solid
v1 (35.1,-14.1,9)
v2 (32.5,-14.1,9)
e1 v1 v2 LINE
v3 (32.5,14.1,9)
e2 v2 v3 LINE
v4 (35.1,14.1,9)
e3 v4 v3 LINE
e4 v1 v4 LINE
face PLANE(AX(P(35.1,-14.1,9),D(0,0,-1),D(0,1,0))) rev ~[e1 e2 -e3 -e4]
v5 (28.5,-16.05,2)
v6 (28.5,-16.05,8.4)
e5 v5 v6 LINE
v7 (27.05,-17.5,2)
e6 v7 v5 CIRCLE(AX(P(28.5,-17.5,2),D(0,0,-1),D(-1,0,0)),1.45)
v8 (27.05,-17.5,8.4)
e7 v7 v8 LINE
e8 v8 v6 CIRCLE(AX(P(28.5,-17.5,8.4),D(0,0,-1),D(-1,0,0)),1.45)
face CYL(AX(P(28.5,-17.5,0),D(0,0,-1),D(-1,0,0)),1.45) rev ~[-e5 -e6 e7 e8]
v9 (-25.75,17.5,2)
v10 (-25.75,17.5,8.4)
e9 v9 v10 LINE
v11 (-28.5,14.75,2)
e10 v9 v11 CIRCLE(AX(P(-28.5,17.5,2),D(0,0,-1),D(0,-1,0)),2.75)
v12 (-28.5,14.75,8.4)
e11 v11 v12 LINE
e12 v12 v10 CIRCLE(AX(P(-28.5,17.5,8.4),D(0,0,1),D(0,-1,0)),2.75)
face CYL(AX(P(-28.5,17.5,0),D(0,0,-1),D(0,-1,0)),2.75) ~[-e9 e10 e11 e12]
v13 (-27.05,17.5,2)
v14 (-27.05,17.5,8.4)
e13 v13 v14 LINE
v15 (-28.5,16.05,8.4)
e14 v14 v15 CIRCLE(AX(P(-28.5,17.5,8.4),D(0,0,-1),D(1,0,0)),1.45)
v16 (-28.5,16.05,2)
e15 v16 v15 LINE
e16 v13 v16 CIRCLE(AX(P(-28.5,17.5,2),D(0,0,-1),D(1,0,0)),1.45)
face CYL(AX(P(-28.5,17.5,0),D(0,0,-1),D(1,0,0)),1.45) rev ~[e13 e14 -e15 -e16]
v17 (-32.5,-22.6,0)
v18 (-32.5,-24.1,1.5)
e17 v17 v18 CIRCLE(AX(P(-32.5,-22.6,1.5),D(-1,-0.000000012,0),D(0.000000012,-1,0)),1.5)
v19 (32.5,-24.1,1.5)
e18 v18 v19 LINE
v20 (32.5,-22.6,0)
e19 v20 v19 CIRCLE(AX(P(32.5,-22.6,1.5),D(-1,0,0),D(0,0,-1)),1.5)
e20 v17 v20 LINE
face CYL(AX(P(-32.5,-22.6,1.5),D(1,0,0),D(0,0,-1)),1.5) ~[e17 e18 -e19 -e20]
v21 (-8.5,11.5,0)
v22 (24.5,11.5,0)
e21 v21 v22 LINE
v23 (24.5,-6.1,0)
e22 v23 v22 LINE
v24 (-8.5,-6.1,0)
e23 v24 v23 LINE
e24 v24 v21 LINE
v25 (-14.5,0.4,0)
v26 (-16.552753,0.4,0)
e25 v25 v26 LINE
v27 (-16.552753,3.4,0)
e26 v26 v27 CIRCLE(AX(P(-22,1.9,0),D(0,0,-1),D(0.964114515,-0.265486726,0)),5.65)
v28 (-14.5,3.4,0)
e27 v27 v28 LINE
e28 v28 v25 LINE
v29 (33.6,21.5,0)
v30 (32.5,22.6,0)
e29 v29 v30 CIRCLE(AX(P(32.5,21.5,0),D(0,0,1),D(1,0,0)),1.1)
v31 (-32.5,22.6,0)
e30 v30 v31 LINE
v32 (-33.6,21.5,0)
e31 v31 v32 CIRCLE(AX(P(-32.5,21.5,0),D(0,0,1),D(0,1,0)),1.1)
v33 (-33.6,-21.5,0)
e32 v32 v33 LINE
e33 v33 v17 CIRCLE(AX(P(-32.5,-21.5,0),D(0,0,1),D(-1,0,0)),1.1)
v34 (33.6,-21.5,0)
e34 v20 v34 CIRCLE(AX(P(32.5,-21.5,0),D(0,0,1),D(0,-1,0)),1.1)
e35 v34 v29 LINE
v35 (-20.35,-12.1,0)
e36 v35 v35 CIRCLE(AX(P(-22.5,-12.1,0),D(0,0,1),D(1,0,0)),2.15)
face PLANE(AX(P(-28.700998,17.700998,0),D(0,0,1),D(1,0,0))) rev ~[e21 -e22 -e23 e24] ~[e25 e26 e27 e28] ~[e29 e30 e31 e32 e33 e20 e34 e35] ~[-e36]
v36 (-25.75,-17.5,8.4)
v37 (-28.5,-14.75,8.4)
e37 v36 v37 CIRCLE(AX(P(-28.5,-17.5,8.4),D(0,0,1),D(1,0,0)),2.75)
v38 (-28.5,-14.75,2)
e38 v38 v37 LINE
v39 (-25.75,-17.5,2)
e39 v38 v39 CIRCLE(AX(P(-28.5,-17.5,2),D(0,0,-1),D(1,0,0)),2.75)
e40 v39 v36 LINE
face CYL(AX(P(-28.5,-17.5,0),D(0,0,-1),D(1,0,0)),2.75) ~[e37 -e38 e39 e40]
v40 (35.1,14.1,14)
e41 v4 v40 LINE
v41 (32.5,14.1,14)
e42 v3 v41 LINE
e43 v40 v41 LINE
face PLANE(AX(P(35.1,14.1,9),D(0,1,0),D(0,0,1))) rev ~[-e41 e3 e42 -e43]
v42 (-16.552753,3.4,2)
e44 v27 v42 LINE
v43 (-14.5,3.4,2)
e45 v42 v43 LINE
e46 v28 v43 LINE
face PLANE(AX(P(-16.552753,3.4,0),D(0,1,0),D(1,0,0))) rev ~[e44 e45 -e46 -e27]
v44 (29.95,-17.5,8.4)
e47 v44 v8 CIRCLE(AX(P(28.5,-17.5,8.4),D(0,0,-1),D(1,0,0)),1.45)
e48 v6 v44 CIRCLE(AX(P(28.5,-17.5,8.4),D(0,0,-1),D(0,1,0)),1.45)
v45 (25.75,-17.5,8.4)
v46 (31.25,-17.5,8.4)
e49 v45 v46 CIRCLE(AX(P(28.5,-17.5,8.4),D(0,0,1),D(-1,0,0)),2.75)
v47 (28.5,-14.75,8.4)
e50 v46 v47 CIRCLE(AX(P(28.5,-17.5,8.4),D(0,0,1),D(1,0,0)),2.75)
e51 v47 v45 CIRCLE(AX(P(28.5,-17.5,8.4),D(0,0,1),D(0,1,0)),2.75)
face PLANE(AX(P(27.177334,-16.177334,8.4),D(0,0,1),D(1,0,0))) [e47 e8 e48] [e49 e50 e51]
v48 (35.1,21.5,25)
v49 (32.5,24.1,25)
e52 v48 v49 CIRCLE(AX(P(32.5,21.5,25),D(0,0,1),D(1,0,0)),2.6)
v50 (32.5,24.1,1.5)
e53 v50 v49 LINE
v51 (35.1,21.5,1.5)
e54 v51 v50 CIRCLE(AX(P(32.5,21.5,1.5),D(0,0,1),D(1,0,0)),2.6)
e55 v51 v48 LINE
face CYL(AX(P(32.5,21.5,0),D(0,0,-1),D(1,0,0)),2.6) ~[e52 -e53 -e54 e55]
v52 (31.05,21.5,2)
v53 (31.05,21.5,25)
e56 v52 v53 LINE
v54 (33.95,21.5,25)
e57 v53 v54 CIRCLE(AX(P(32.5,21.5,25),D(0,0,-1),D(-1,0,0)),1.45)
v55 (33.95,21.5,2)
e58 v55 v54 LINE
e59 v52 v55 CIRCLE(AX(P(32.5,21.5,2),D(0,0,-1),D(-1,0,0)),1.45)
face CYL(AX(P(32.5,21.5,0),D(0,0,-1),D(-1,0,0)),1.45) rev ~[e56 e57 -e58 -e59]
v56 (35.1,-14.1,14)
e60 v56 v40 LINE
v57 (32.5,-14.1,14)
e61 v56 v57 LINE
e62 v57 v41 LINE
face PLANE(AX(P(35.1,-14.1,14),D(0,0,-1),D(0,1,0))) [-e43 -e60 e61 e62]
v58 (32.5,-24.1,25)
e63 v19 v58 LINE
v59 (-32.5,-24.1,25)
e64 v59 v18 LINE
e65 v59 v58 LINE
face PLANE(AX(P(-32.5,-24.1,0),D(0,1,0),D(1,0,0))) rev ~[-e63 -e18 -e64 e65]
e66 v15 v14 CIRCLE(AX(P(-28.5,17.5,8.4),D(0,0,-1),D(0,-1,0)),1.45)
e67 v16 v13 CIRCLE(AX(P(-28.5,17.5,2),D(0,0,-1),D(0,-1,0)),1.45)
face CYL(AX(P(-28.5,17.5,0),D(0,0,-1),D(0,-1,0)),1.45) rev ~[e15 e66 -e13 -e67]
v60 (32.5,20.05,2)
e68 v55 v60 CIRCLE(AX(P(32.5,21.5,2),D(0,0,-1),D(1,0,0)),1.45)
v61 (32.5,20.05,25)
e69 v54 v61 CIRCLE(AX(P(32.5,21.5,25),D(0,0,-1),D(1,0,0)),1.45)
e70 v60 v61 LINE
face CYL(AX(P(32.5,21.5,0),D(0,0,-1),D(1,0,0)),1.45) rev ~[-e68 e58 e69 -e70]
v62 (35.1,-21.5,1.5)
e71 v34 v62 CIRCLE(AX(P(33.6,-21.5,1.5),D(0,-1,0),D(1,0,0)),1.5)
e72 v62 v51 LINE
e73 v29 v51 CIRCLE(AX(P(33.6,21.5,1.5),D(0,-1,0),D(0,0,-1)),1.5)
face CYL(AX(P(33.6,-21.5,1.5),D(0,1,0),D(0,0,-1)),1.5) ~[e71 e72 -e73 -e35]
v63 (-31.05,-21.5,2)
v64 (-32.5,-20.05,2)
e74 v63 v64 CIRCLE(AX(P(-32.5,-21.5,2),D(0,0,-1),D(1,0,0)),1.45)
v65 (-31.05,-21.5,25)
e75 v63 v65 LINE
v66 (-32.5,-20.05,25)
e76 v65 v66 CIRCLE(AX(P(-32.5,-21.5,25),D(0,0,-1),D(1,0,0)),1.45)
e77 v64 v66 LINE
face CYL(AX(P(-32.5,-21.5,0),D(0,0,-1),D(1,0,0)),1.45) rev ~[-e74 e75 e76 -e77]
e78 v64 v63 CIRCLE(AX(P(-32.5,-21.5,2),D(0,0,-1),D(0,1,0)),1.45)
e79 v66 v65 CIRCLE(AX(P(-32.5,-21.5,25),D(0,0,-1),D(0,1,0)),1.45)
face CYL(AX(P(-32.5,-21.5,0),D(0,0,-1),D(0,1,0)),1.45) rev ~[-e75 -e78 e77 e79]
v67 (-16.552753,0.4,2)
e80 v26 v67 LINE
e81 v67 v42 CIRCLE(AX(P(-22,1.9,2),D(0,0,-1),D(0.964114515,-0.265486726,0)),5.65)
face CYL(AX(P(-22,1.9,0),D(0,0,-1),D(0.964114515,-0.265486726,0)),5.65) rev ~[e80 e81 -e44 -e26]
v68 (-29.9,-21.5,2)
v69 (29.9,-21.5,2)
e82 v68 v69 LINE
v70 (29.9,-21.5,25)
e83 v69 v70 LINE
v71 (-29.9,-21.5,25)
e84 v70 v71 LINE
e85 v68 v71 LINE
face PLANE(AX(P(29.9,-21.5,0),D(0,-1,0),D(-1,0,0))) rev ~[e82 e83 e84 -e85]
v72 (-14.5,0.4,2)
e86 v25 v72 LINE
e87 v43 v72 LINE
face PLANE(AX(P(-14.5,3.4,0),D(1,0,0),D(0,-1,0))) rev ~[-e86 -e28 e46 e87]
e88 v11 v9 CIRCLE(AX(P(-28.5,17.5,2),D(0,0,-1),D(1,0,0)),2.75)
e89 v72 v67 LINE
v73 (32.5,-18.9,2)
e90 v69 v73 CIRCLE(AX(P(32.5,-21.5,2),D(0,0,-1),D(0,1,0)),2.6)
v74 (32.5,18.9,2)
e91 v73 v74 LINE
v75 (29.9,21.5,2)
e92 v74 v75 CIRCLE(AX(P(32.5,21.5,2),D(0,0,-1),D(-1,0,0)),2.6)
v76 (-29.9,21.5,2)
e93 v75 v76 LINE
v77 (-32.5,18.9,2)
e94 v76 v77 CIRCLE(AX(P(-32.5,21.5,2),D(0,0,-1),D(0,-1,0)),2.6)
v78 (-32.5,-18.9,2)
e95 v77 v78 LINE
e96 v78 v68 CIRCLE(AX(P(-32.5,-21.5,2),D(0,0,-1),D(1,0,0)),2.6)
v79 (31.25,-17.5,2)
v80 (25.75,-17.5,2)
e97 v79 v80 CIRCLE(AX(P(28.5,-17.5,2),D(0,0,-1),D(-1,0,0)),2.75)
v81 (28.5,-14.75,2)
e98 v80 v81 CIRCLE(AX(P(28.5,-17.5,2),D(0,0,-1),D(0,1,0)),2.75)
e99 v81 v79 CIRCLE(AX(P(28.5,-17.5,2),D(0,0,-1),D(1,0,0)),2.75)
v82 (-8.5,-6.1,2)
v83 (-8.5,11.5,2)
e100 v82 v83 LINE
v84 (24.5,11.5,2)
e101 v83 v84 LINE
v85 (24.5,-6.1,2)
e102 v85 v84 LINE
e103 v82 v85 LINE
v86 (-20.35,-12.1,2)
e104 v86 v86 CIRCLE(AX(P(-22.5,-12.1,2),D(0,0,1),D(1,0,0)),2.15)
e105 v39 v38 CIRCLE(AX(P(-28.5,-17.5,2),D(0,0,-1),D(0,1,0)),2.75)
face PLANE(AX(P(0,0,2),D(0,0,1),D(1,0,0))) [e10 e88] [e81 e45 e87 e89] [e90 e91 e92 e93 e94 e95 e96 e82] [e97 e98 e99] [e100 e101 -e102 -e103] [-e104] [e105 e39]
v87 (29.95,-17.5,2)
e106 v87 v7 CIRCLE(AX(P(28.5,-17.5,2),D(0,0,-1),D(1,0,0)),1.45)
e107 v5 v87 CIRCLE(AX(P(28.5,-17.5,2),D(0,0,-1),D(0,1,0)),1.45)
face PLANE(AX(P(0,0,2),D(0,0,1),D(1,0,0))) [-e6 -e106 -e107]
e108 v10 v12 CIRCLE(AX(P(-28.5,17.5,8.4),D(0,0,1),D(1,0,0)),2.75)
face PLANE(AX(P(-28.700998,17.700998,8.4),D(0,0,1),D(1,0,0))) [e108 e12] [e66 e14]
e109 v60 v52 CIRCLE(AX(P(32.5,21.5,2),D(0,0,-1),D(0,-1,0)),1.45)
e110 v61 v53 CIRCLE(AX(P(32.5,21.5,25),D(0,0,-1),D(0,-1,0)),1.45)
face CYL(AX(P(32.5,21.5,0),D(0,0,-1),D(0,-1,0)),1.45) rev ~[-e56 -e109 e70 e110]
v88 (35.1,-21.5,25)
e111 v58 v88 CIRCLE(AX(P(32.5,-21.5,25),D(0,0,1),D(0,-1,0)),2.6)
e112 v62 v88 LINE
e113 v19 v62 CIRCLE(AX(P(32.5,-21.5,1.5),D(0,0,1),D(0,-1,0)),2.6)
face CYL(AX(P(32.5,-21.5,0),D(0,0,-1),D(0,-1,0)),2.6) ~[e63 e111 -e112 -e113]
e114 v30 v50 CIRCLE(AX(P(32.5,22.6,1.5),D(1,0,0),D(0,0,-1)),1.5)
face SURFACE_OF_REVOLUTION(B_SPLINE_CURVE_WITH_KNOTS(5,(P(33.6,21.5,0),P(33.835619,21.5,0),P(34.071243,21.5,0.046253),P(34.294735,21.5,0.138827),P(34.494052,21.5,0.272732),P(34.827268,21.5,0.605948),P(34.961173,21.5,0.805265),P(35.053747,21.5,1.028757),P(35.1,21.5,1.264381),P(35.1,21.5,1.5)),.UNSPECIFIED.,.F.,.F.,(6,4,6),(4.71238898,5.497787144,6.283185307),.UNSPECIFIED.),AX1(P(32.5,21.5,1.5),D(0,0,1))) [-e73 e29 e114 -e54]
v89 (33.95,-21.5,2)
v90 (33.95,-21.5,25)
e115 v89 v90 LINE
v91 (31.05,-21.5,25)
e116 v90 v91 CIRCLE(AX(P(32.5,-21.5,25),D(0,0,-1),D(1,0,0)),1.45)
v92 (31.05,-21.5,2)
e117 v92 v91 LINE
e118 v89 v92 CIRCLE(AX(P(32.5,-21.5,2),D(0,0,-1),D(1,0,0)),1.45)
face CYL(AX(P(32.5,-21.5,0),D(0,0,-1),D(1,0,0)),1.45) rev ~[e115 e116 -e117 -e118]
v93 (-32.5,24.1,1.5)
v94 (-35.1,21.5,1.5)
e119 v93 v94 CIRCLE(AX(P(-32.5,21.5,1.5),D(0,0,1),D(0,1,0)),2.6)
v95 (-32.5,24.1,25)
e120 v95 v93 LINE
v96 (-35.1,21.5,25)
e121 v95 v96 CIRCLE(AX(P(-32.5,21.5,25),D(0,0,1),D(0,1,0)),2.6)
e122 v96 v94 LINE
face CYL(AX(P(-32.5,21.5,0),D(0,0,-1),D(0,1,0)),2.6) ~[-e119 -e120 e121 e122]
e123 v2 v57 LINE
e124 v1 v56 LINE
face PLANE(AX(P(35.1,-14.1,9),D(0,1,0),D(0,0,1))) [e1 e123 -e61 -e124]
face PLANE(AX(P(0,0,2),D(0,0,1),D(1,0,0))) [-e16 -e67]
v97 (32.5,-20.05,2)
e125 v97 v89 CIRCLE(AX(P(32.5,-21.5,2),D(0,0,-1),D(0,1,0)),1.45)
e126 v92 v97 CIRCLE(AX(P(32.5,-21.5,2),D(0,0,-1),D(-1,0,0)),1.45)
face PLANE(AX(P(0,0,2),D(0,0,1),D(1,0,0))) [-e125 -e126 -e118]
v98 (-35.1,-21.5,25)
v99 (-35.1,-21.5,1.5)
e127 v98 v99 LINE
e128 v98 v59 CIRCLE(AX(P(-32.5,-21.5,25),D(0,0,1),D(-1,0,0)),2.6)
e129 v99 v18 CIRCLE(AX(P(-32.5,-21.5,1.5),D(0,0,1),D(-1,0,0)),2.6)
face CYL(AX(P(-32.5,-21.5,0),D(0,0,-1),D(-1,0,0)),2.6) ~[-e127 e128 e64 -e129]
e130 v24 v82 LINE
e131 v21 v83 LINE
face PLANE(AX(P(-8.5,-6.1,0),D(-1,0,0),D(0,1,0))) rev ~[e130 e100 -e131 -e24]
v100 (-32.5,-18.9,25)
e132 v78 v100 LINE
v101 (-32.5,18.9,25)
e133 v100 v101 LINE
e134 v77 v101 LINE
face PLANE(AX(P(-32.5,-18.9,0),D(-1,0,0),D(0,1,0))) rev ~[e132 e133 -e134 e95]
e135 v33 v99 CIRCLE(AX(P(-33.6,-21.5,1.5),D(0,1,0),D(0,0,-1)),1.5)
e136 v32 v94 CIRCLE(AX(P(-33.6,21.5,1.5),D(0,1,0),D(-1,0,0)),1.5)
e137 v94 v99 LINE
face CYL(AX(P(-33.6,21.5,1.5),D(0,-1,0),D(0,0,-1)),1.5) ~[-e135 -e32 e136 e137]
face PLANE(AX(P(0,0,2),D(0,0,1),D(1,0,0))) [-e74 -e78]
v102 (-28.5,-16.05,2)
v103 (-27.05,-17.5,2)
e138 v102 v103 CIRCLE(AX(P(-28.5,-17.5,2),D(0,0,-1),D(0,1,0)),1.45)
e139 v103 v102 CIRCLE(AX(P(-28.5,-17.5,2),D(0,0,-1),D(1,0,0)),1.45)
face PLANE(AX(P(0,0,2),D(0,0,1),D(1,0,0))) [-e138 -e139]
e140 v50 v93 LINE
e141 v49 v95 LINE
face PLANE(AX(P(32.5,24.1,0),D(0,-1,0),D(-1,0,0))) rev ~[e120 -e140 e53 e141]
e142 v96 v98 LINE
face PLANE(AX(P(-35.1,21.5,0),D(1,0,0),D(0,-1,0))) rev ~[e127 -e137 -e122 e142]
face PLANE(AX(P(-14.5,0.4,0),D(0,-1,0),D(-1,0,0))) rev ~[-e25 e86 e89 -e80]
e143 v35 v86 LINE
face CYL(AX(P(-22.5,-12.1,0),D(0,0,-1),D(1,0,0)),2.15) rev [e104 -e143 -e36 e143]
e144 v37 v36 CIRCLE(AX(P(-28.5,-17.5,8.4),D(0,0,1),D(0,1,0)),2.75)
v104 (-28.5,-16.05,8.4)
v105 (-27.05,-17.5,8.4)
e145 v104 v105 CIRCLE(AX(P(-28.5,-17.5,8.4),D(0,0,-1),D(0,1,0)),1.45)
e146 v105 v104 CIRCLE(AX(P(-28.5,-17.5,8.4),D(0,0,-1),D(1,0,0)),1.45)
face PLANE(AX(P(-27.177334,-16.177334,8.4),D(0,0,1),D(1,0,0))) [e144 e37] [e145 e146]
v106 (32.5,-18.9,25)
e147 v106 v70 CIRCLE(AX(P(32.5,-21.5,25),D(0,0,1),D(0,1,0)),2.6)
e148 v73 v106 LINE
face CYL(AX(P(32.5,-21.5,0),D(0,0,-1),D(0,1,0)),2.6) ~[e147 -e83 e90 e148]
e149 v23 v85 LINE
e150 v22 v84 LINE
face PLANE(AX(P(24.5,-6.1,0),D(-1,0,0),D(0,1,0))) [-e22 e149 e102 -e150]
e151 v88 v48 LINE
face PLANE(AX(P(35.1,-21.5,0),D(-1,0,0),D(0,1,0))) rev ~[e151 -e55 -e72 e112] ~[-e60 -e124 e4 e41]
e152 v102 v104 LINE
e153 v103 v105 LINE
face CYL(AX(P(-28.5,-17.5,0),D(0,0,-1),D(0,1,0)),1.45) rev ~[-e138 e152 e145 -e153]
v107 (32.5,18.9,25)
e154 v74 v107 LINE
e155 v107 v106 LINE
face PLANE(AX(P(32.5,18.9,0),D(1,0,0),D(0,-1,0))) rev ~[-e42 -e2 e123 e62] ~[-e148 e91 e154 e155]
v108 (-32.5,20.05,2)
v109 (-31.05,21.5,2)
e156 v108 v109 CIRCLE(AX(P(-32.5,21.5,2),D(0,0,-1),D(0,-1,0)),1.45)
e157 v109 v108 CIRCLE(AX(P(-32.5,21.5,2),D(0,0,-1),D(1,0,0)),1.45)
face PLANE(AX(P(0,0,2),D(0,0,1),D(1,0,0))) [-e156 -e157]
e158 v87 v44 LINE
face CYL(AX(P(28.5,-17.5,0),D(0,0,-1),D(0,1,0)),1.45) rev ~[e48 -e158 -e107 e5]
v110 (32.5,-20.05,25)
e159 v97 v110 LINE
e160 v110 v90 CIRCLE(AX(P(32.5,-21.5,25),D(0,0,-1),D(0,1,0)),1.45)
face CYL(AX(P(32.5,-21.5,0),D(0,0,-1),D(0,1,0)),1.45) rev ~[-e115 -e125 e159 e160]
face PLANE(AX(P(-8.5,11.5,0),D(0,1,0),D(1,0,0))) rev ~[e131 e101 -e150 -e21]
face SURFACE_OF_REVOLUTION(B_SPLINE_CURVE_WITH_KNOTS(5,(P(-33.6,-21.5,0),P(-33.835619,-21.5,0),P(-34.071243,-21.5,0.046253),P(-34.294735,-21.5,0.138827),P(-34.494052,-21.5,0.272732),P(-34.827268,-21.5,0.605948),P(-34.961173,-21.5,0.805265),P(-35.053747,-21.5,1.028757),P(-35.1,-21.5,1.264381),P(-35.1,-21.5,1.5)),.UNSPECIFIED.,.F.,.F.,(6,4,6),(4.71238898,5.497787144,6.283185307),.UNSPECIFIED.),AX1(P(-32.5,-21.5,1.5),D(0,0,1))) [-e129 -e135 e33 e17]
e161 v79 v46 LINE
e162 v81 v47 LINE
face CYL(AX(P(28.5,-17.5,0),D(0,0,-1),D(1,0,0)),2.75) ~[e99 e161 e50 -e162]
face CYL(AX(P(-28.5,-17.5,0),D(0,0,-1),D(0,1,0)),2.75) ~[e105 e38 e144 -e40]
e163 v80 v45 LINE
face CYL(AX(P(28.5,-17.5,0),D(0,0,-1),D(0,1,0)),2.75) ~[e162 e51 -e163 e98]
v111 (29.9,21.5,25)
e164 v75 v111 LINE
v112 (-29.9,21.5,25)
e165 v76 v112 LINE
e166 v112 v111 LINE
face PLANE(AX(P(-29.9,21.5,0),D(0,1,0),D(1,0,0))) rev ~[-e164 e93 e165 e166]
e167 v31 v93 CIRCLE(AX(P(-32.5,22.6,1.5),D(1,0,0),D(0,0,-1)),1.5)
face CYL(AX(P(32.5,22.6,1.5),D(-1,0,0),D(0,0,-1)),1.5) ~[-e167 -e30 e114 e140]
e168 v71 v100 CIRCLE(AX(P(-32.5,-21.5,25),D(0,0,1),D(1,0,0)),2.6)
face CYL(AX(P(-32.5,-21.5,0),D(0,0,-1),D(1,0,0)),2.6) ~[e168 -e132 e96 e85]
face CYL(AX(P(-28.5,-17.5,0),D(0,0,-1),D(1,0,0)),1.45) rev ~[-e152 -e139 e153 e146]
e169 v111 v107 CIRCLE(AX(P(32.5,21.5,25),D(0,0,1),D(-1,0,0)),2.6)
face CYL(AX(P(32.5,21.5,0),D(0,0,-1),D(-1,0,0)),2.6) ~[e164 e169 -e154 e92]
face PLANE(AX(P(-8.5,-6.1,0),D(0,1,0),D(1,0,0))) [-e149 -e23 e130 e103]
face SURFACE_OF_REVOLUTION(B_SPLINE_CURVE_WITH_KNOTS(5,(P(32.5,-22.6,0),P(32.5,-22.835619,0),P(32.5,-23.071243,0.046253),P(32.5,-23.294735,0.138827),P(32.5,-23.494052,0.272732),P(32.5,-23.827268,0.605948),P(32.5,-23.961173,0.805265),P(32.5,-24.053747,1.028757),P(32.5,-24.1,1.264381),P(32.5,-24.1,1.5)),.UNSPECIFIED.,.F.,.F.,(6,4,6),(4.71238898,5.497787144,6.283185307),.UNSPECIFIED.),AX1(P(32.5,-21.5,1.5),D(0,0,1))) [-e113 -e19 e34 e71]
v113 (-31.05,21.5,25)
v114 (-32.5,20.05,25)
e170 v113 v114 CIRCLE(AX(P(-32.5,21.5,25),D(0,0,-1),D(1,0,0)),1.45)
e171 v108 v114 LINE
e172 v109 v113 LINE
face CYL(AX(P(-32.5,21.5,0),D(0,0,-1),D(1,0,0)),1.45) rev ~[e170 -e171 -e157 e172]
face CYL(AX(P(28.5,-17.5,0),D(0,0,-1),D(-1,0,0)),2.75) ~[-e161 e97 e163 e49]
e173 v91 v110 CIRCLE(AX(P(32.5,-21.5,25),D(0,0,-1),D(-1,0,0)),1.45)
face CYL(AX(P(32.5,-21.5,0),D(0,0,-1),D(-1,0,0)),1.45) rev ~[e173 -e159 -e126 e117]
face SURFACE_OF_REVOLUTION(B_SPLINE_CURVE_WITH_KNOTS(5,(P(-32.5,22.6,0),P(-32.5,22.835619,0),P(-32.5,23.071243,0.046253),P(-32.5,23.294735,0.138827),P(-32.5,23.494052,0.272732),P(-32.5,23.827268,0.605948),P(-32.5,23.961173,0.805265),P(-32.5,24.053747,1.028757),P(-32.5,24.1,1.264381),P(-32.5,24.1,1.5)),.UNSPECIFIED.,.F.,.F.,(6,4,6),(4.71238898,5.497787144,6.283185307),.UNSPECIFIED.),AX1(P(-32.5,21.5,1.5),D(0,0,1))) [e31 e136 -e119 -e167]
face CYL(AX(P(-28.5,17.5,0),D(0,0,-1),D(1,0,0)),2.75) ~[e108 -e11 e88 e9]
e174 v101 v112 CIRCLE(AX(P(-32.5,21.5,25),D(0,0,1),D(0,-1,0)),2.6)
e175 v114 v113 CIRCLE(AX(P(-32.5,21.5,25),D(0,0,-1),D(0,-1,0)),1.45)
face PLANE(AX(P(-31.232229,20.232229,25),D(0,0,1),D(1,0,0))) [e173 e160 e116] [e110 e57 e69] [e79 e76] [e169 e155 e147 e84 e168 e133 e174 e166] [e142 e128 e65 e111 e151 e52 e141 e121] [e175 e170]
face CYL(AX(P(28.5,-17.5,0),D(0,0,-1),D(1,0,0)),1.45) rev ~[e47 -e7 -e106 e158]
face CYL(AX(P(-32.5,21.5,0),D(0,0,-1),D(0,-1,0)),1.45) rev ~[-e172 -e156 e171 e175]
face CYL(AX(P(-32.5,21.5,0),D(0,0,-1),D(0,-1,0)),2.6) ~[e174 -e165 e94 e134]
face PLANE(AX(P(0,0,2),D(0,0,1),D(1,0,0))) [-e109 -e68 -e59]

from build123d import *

# Parameters (mm, degrees)
F0_R     = 2.15
F0_W     = 33
F0_H     = 17.6
F1_DEPTH = 2
F2_DEPTH = 25
F3_DEPTH = 8.4
F4_DEPTH = 25
F5_R     = 1.5
F6_W     = 28.2
F6_H     = 5
F7_DEPTH = 3.5


# Not quite as in the source:
# - a feature names something its author has since deleted; it is built from what else it names


with BuildPart() as f1:
    # F0 (on Top) → F1 (new body)
    with BuildSketch(Plane.XY):
        with BuildLine():
            Line((-29.9, -21.5), (29.9, -21.5))
            ThreePointArc((29.9, -21.5), (30.6615223689, -19.6615223689), (32.5, -18.9))
            Line((32.5, -18.9), (32.5, 18.9))
            ThreePointArc((32.5, 18.9), (30.6615223689, 19.6615223689), (29.9, 21.5))
            Line((29.9, 21.5), (-29.9, 21.5))
            ThreePointArc((-29.9, 21.5), (-30.6615223689, 19.6615223689), (-32.5, 18.9))
            Line((-32.5, 18.9), (-32.5, -18.9))
            ThreePointArc((-32.5, -18.9), (-30.6615223689, -19.6615223689), (-29.9, -21.5))
        make_face()
        with BuildLine():
            Line((25.75, -17.5), (-25.75, -17.5))
            ThreePointArc((-25.75, -17.5), (-30.4445436483, -19.4445436483), (-28.5, -14.75))
            Line((-28.5, -14.75), (-28.5, 14.75))
            ThreePointArc((-28.5, 14.75), (-30.4445436483, 19.4445436483), (-25.75, 17.5))
            Line((-25.75, 17.5), (28.5, 17.5))
            Line((28.5, 17.5), (28.5, -14.75))
            ThreePointArc((28.5, -14.75), (30.4445436483, -15.5554563517), (31.25, -17.5))
            ThreePointArc((31.25, -17.5), (28.5, -20.25), (25.75, -17.5))
        make_face(mode=Mode.SUBTRACT)
        with BuildLine():
            ThreePointArc((-28.5, -14.75), (-26.5554563517, -15.5554563517), (-25.75, -17.5))
            Line((-25.75, -17.5), (25.75, -17.5))
            ThreePointArc((25.75, -17.5), (26.5554563517, -15.5554563517), (28.5, -14.75))
            Line((28.5, -14.75), (28.5, 17.5))
            Line((28.5, 17.5), (-25.75, 17.5))
            ThreePointArc((-25.75, 17.5), (-26.5554563517, 15.5554563517), (-28.5, 14.75))
            Line((-28.5, 14.75), (-28.5, -14.75))
        make_face()
        with Locations((-22.5, -12.1)):
            Circle(F0_R, mode=Mode.SUBTRACT)
        with BuildLine():
            ThreePointArc((-16.5527529889, 0.4), (-27.65, 1.9), (-16.5527529889, 3.4))
            Line((-16.5527529889, 3.4), (-14.5, 3.4))
            Line((-14.5, 3.4), (-14.5, 0.4))
            Line((-14.5, 0.4), (-16.5527529889, 0.4))
        make_face(mode=Mode.SUBTRACT)
        with Locations((8, 2.7)):
            Rectangle(F0_W, F0_H, mode=Mode.SUBTRACT)
        with BuildLine():
            Line((-32.4999999696, -24.1), (32.5, -24.1))
            ThreePointArc((32.5, -24.1), (30.6615223689, -23.3384776311), (29.9, -21.5))
            Line((29.9, -21.5), (-29.9, -21.5))
            ThreePointArc((-29.9, -21.5), (-30.6615223582, -23.3384776203), (-32.4999999696, -24.1))
        make_face()
        with BuildLine():
            ThreePointArc((29.9, 21.5), (30.6615223689, 23.3384776311), (32.5, 24.1))
            Line((32.5, 24.1), (-32.5, 24.1))
            ThreePointArc((-32.5, 24.1), (-30.6615223689, 23.3384776311), (-29.9, 21.5))
            Line((-29.9, 21.5), (29.9, 21.5))
        make_face()
        with BuildLine():
            Line((-35.1, 21.5), (-35.1, -21.5))
            ThreePointArc((-35.1, -21.5), (-34.3384776311, -19.6615223689), (-32.5, -18.9))
            Line((-32.5, -18.9), (-32.5, 18.9))
            ThreePointArc((-32.5, 18.9), (-34.3384776311, 19.6615223689), (-35.1, 21.5))
        make_face()
        with BuildLine():
            ThreePointArc((32.5, -18.9), (34.3384776311, -19.6615223689), (35.1, -21.5))
            Line((35.1, -21.5), (35.1, 21.5))
            ThreePointArc((35.1, 21.5), (34.3384776311, 19.6615223689), (32.5, 18.9))
            Line((32.5, 18.9), (32.5, -18.9))
        make_face()
        with BuildLine():
            ThreePointArc((-28.5, -14.75), (-30.4445436483, -19.4445436483), (-25.75, -17.5))
            Line((-25.75, -17.5), (-27.05, -17.5))
            ThreePointArc((-27.05, -17.5), (-29.5253048327, -18.5253048327), (-28.5, -16.05))
            Line((-28.5, -16.05), (-28.5, -14.75))
        make_face()
        with BuildLine():
            ThreePointArc((-25.75, 17.5), (-30.4445436483, 19.4445436483), (-28.5, 14.75))
            Line((-28.5, 14.75), (-28.5, 16.05))
            ThreePointArc((-28.5, 16.05), (-29.5253048327, 18.5253048327), (-27.05, 17.5))
            Line((-27.05, 17.5), (-25.75, 17.5))
        make_face()
        with BuildLine():
            Line((27.05, -17.5), (25.75, -17.5))
            ThreePointArc((25.75, -17.5), (28.5, -20.25), (31.25, -17.5))
            ThreePointArc((31.25, -17.5), (30.4445436483, -15.5554563517), (28.5, -14.75))
            Line((28.5, -14.75), (28.5, -16.05))
            ThreePointArc((28.5, -16.05), (29.5253048327, -16.4746951673), (29.95, -17.5))
            ThreePointArc((29.95, -17.5), (28.5, -18.95), (27.05, -17.5))
        make_face()
        with BuildLine():
            ThreePointArc((-35.1, -21.5), (-34.3384776203, -23.3384776418), (-32.4999999696, -24.1))
            ThreePointArc((-32.4999999696, -24.1), (-30.6615223582, -23.3384776203), (-29.9, -21.5))
            Line((-29.9, -21.5), (-31.05, -21.5))
            ThreePointArc((-31.05, -21.5), (-33.5253048327, -22.5253048327), (-32.5, -20.05))
            Line((-32.5, -20.05), (-32.5, -18.9))
            ThreePointArc((-32.5, -18.9), (-34.3384776311, -19.6615223689), (-35.1, -21.5))
        make_face()
        with BuildLine():
            ThreePointArc((32.5, 18.9), (34.3384776311, 19.6615223689), (35.1, 21.5))
            ThreePointArc((35.1, 21.5), (34.3384776311, 23.3384776311), (32.5, 24.1))
            ThreePointArc((32.5, 24.1), (30.6615223689, 23.3384776311), (29.9, 21.5))
            Line((29.9, 21.5), (31.05, 21.5))
            ThreePointArc((31.05, 21.5), (32.5, 22.95), (33.95, 21.5))
            ThreePointArc((33.95, 21.5), (33.5253048327, 20.4746951673), (32.5, 20.05))
            Line((32.5, 20.05), (32.5, 18.9))
        make_face()
        with BuildLine():
            ThreePointArc((-32.5, 24.1), (-34.3384776311, 23.3384776311), (-35.1, 21.5))
            ThreePointArc((-35.1, 21.5), (-34.3384776311, 19.6615223689), (-32.5, 18.9))
            Line((-32.5, 18.9), (-32.5, 20.05))
            ThreePointArc((-32.5, 20.05), (-33.5253048327, 22.5253048327), (-31.05, 21.5))
            Line((-31.05, 21.5), (-29.9, 21.5))
            ThreePointArc((-29.9, 21.5), (-30.6615223689, 23.3384776311), (-32.5, 24.1))
        make_face()
        with BuildLine():
            ThreePointArc((29.9, -21.5), (30.6615223689, -23.3384776311), (32.5, -24.1))
            ThreePointArc((32.5, -24.1), (34.3384776311, -23.3384776311), (35.1, -21.5))
            ThreePointArc((35.1, -21.5), (34.3384776311, -19.6615223689), (32.5, -18.9))
            Line((32.5, -18.9), (32.5, -20.05))
            ThreePointArc((32.5, -20.05), (33.5253048327, -20.4746951673), (33.95, -21.5))
            ThreePointArc((33.95, -21.5), (32.5, -22.95), (31.05, -21.5))
            Line((31.05, -21.5), (29.9, -21.5))
        make_face()
        with BuildLine():
            ThreePointArc((-28.5, -16.05), (-29.5253048327, -18.5253048327), (-27.05, -17.5))
            Line((-27.05, -17.5), (-28.5, -17.5))
            Line((-28.5, -17.5), (-28.5, -16.05))
        make_face()
        with BuildLine():
            ThreePointArc((-32.5, -20.05), (-33.5253048327, -22.5253048327), (-31.05, -21.5))
            Line((-31.05, -21.5), (-32.5, -21.5))
            Line((-32.5, -21.5), (-32.5, -20.05))
        make_face()
        with BuildLine():
            Line((32.5, 21.5), (32.5, 20.05))
            ThreePointArc((32.5, 20.05), (33.5253048327, 20.4746951673), (33.95, 21.5))
            ThreePointArc((33.95, 21.5), (32.5, 22.95), (31.05, 21.5))
            Line((31.05, 21.5), (32.5, 21.5))
        make_face()
        with BuildLine():
            ThreePointArc((-31.05, 21.5), (-33.5253048327, 22.5253048327), (-32.5, 20.05))
            Line((-32.5, 20.05), (-32.5, 21.5))
            Line((-32.5, 21.5), (-31.05, 21.5))
        make_face()
        with BuildLine():
            Line((32.5, -21.5), (31.05, -21.5))
            ThreePointArc((31.05, -21.5), (32.5, -22.95), (33.95, -21.5))
            ThreePointArc((33.95, -21.5), (33.5253048327, -20.4746951673), (32.5, -20.05))
            Line((32.5, -20.05), (32.5, -21.5))
        make_face()
        with BuildLine():
            ThreePointArc((-27.05, 17.5), (-29.5253048327, 18.5253048327), (-28.5, 16.05))
            Line((-28.5, 16.05), (-28.5, 17.5))
            Line((-28.5, 17.5), (-27.05, 17.5))
        make_face()
        with BuildLine():
            Line((28.5, -17.5), (27.05, -17.5))
            ThreePointArc((27.05, -17.5), (28.5, -18.95), (29.95, -17.5))
            ThreePointArc((29.95, -17.5), (29.5253048327, -16.4746951673), (28.5, -16.05))
            Line((28.5, -16.05), (28.5, -17.5))
        make_face()
        with BuildLine():
            Line((-27.05, -17.5), (-25.75, -17.5))
            ThreePointArc((-25.75, -17.5), (-26.5554563517, -15.5554563517), (-28.5, -14.75))
            Line((-28.5, -14.75), (-28.5, -16.05))
            ThreePointArc((-28.5, -16.05), (-27.4746951673, -16.4746951673), (-27.05, -17.5))
        make_face()
        with BuildLine():
            Line((-28.5, 16.05), (-28.5, 14.75))
            ThreePointArc((-28.5, 14.75), (-26.5554563517, 15.5554563517), (-25.75, 17.5))
            Line((-25.75, 17.5), (-27.05, 17.5))
            ThreePointArc((-27.05, 17.5), (-27.4746951673, 16.4746951673), (-28.5, 16.05))
        make_face()
        with BuildLine():
            ThreePointArc((28.5, -14.75), (26.5554563517, -15.5554563517), (25.75, -17.5))
            Line((25.75, -17.5), (27.05, -17.5))
            ThreePointArc((27.05, -17.5), (27.4746951673, -16.4746951673), (28.5, -16.05))
            Line((28.5, -16.05), (28.5, -14.75))
        make_face()
        with BuildLine():
            Line((-31.05, -21.5), (-29.9, -21.5))
            ThreePointArc((-29.9, -21.5), (-30.6615223689, -19.6615223689), (-32.5, -18.9))
            Line((-32.5, -18.9), (-32.5, -20.05))
            ThreePointArc((-32.5, -20.05), (-31.4746951673, -20.4746951673), (-31.05, -21.5))
        make_face()
        with BuildLine():
            ThreePointArc((29.9, 21.5), (30.6615223689, 19.6615223689), (32.5, 18.9))
            Line((32.5, 18.9), (32.5, 20.05))
            ThreePointArc((32.5, 20.05), (31.4746951673, 20.4746951673), (31.05, 21.5))
            Line((31.05, 21.5), (29.9, 21.5))
        make_face()
        with BuildLine():
            Line((-32.5, 20.05), (-32.5, 18.9))
            ThreePointArc((-32.5, 18.9), (-30.6615223689, 19.6615223689), (-29.9, 21.5))
            Line((-29.9, 21.5), (-31.05, 21.5))
            ThreePointArc((-31.05, 21.5), (-31.4746951673, 20.4746951673), (-32.5, 20.05))
        make_face()
        with BuildLine():
            ThreePointArc((32.5, -18.9), (30.6615223689, -19.6615223689), (29.9, -21.5))
            Line((29.9, -21.5), (31.05, -21.5))
            ThreePointArc((31.05, -21.5), (31.4746951673, -20.4746951673), (32.5, -20.05))
            Line((32.5, -20.05), (32.5, -18.9))
        make_face()
        with BuildLine():
            Line((-28.5, -17.5), (-27.05, -17.5))
            ThreePointArc((-27.05, -17.5), (-27.4746951673, -16.4746951673), (-28.5, -16.05))
            Line((-28.5, -16.05), (-28.5, -17.5))
        make_face()
        with BuildLine():
            Line((-32.5, -21.5), (-31.05, -21.5))
            ThreePointArc((-31.05, -21.5), (-31.4746951673, -20.4746951673), (-32.5, -20.05))
            Line((-32.5, -20.05), (-32.5, -21.5))
        make_face()
        with BuildLine():
            ThreePointArc((31.05, 21.5), (31.4746951673, 20.4746951673), (32.5, 20.05))
            Line((32.5, 20.05), (32.5, 21.5))
            Line((32.5, 21.5), (31.05, 21.5))
        make_face()
        with BuildLine():
            Line((-32.5, 21.5), (-32.5, 20.05))
            ThreePointArc((-32.5, 20.05), (-31.4746951673, 20.4746951673), (-31.05, 21.5))
            Line((-31.05, 21.5), (-32.5, 21.5))
        make_face()
        with BuildLine():
            ThreePointArc((32.5, -20.05), (31.4746951673, -20.4746951673), (31.05, -21.5))
            Line((31.05, -21.5), (32.5, -21.5))
            Line((32.5, -21.5), (32.5, -20.05))
        make_face()
        with BuildLine():
            Line((-28.5, 17.5), (-28.5, 16.05))
            ThreePointArc((-28.5, 16.05), (-27.4746951673, 16.4746951673), (-27.05, 17.5))
            Line((-27.05, 17.5), (-28.5, 17.5))
        make_face()
        with BuildLine():
            ThreePointArc((28.5, -16.05), (27.4746951673, -16.4746951673), (27.05, -17.5))
            Line((27.05, -17.5), (28.5, -17.5))
            Line((28.5, -17.5), (28.5, -16.05))
        make_face()
    extrude(amount=F1_DEPTH)

    # F0 (on Top) → F2 (join)
    with BuildSketch(Plane.XY):
        with BuildLine():
            Line((-32.5, 20.05), (-32.5, 18.9))
            ThreePointArc((-32.5, 18.9), (-30.6615223689, 19.6615223689), (-29.9, 21.5))
            Line((-29.9, 21.5), (-31.05, 21.5))
            ThreePointArc((-31.05, 21.5), (-31.4746951673, 20.4746951673), (-32.5, 20.05))
        make_face()
        with BuildLine():
            ThreePointArc((-32.5, 24.1), (-34.3384776311, 23.3384776311), (-35.1, 21.5))
            ThreePointArc((-35.1, 21.5), (-34.3384776311, 19.6615223689), (-32.5, 18.9))
            Line((-32.5, 18.9), (-32.5, 20.05))
            ThreePointArc((-32.5, 20.05), (-33.5253048327, 22.5253048327), (-31.05, 21.5))
            Line((-31.05, 21.5), (-29.9, 21.5))
            ThreePointArc((-29.9, 21.5), (-30.6615223689, 23.3384776311), (-32.5, 24.1))
        make_face()
        with BuildLine():
            Line((-35.1, 21.5), (-35.1, -21.5))
            ThreePointArc((-35.1, -21.5), (-34.3384776311, -19.6615223689), (-32.5, -18.9))
            Line((-32.5, -18.9), (-32.5, 18.9))
            ThreePointArc((-32.5, 18.9), (-34.3384776311, 19.6615223689), (-35.1, 21.5))
        make_face()
        with BuildLine():
            ThreePointArc((29.9, 21.5), (30.6615223689, 23.3384776311), (32.5, 24.1))
            Line((32.5, 24.1), (-32.5, 24.1))
            ThreePointArc((-32.5, 24.1), (-30.6615223689, 23.3384776311), (-29.9, 21.5))
            Line((-29.9, 21.5), (29.9, 21.5))
        make_face()
        with BuildLine():
            ThreePointArc((29.9, 21.5), (30.6615223689, 19.6615223689), (32.5, 18.9))
            Line((32.5, 18.9), (32.5, 20.05))
            ThreePointArc((32.5, 20.05), (31.4746951673, 20.4746951673), (31.05, 21.5))
            Line((31.05, 21.5), (29.9, 21.5))
        make_face()
        with BuildLine():
            ThreePointArc((32.5, 18.9), (34.3384776311, 19.6615223689), (35.1, 21.5))
            ThreePointArc((35.1, 21.5), (34.3384776311, 23.3384776311), (32.5, 24.1))
            ThreePointArc((32.5, 24.1), (30.6615223689, 23.3384776311), (29.9, 21.5))
            Line((29.9, 21.5), (31.05, 21.5))
            ThreePointArc((31.05, 21.5), (32.5, 22.95), (33.95, 21.5))
            ThreePointArc((33.95, 21.5), (33.5253048327, 20.4746951673), (32.5, 20.05))
            Line((32.5, 20.05), (32.5, 18.9))
        make_face()
        with BuildLine():
            ThreePointArc((32.5, -18.9), (34.3384776311, -19.6615223689), (35.1, -21.5))
            Line((35.1, -21.5), (35.1, 21.5))
            ThreePointArc((35.1, 21.5), (34.3384776311, 19.6615223689), (32.5, 18.9))
            Line((32.5, 18.9), (32.5, -18.9))
        make_face()
        with BuildLine():
            ThreePointArc((29.9, -21.5), (30.6615223689, -23.3384776311), (32.5, -24.1))
            ThreePointArc((32.5, -24.1), (34.3384776311, -23.3384776311), (35.1, -21.5))
            ThreePointArc((35.1, -21.5), (34.3384776311, -19.6615223689), (32.5, -18.9))
            Line((32.5, -18.9), (32.5, -20.05))
            ThreePointArc((32.5, -20.05), (33.5253048327, -20.4746951673), (33.95, -21.5))
            ThreePointArc((33.95, -21.5), (32.5, -22.95), (31.05, -21.5))
            Line((31.05, -21.5), (29.9, -21.5))
        make_face()
        with BuildLine():
            ThreePointArc((32.5, -18.9), (30.6615223689, -19.6615223689), (29.9, -21.5))
            Line((29.9, -21.5), (31.05, -21.5))
            ThreePointArc((31.05, -21.5), (31.4746951673, -20.4746951673), (32.5, -20.05))
            Line((32.5, -20.05), (32.5, -18.9))
        make_face()
        with BuildLine():
            Line((-32.4999999696, -24.1), (32.5, -24.1))
            ThreePointArc((32.5, -24.1), (30.6615223689, -23.3384776311), (29.9, -21.5))
            Line((29.9, -21.5), (-29.9, -21.5))
            ThreePointArc((-29.9, -21.5), (-30.6615223582, -23.3384776203), (-32.4999999696, -24.1))
        make_face()
        with BuildLine():
            Line((-31.05, -21.5), (-29.9, -21.5))
            ThreePointArc((-29.9, -21.5), (-30.6615223689, -19.6615223689), (-32.5, -18.9))
            Line((-32.5, -18.9), (-32.5, -20.05))
            ThreePointArc((-32.5, -20.05), (-31.4746951673, -20.4746951673), (-31.05, -21.5))
        make_face()
        with BuildLine():
            ThreePointArc((-35.1, -21.5), (-34.3384776203, -23.3384776418), (-32.4999999696, -24.1))
            ThreePointArc((-32.4999999696, -24.1), (-30.6615223582, -23.3384776203), (-29.9, -21.5))
            Line((-29.9, -21.5), (-31.05, -21.5))
            ThreePointArc((-31.05, -21.5), (-33.5253048327, -22.5253048327), (-32.5, -20.05))
            Line((-32.5, -20.05), (-32.5, -18.9))
            ThreePointArc((-32.5, -18.9), (-34.3384776311, -19.6615223689), (-35.1, -21.5))
        make_face()
    extrude(amount=F2_DEPTH)

    # F0 (on Top) → F3 (join)
    with BuildSketch(Plane.XY):
        with BuildLine():
            ThreePointArc((-25.75, 17.5), (-30.4445436483, 19.4445436483), (-28.5, 14.75))
            Line((-28.5, 14.75), (-28.5, 16.05))
            ThreePointArc((-28.5, 16.05), (-29.5253048327, 18.5253048327), (-27.05, 17.5))
            Line((-27.05, 17.5), (-25.75, 17.5))
        make_face()
        with BuildLine():
            Line((-28.5, 16.05), (-28.5, 14.75))
            ThreePointArc((-28.5, 14.75), (-26.5554563517, 15.5554563517), (-25.75, 17.5))
            Line((-25.75, 17.5), (-27.05, 17.5))
            ThreePointArc((-27.05, 17.5), (-27.4746951673, 16.4746951673), (-28.5, 16.05))
        make_face()
        with BuildLine():
            ThreePointArc((28.5, -14.75), (26.5554563517, -15.5554563517), (25.75, -17.5))
            Line((25.75, -17.5), (27.05, -17.5))
            ThreePointArc((27.05, -17.5), (27.4746951673, -16.4746951673), (28.5, -16.05))
            Line((28.5, -16.05), (28.5, -14.75))
        make_face()
        with BuildLine():
            Line((27.05, -17.5), (25.75, -17.5))
            ThreePointArc((25.75, -17.5), (28.5, -20.25), (31.25, -17.5))
            ThreePointArc((31.25, -17.5), (30.4445436483, -15.5554563517), (28.5, -14.75))
            Line((28.5, -14.75), (28.5, -16.05))
            ThreePointArc((28.5, -16.05), (29.5253048327, -16.4746951673), (29.95, -17.5))
            ThreePointArc((29.95, -17.5), (28.5, -18.95), (27.05, -17.5))
        make_face()
        with BuildLine():
            Line((-27.05, -17.5), (-25.75, -17.5))
            ThreePointArc((-25.75, -17.5), (-26.5554563517, -15.5554563517), (-28.5, -14.75))
            Line((-28.5, -14.75), (-28.5, -16.05))
            ThreePointArc((-28.5, -16.05), (-27.4746951673, -16.4746951673), (-27.05, -17.5))
        make_face()
        with BuildLine():
            ThreePointArc((-28.5, -14.75), (-30.4445436483, -19.4445436483), (-25.75, -17.5))
            Line((-25.75, -17.5), (-27.05, -17.5))
            ThreePointArc((-27.05, -17.5), (-29.5253048327, -18.5253048327), (-28.5, -16.05))
            Line((-28.5, -16.05), (-28.5, -14.75))
        make_face()
    extrude(amount=F3_DEPTH)

    # F0 (on Top) → F4 (cut)
    with BuildSketch(Plane.XY):
        with Locations((8, 2.7)):
            Rectangle(F0_W, F0_H)
        with BuildLine():
            Line((-22, 3.4), (-16.5527529889, 3.4))
            ThreePointArc((-16.5527529889, 3.4), (-27.65, 1.9), (-16.5527529889, 0.4))
            Line((-16.5527529889, 0.4), (-22, 0.4))
            Line((-22, 0.4), (-22, 3.4))
        make_face()
        with BuildLine():
            ThreePointArc((-16.5527529889, 0.4), (-16.4009176818, 1.1431795499), (-16.35, 1.9))
            ThreePointArc((-16.35, 1.9), (-16.4009176818, 2.6568204501), (-16.5527529889, 3.4))
            Line((-16.5527529889, 3.4), (-22, 3.4))
            Line((-22, 3.4), (-22, 0.4))
            Line((-22, 0.4), (-16.5527529889, 0.4))
        make_face()
        with Locations((-22.5, -12.1)):
            Circle(F0_R)
    extrude(amount=-F4_DEPTH, mode=Mode.SUBTRACT)

    # F5
    f5_edges = [f1.edges().sort_by_distance(p)[0] for p in [
        (0, 24.1, 0),
    ]]
    fillet(f5_edges, radius=F5_R)

    # F6 (on face) → F7 (cut)
    with BuildSketch(Plane.YZ.offset(35.1)):
        with Locations((0, 11.5)):
            Rectangle(F6_W, F6_H)
    extrude(amount=-F7_DEPTH, mode=Mode.SUBTRACT)


solid = f1.part
